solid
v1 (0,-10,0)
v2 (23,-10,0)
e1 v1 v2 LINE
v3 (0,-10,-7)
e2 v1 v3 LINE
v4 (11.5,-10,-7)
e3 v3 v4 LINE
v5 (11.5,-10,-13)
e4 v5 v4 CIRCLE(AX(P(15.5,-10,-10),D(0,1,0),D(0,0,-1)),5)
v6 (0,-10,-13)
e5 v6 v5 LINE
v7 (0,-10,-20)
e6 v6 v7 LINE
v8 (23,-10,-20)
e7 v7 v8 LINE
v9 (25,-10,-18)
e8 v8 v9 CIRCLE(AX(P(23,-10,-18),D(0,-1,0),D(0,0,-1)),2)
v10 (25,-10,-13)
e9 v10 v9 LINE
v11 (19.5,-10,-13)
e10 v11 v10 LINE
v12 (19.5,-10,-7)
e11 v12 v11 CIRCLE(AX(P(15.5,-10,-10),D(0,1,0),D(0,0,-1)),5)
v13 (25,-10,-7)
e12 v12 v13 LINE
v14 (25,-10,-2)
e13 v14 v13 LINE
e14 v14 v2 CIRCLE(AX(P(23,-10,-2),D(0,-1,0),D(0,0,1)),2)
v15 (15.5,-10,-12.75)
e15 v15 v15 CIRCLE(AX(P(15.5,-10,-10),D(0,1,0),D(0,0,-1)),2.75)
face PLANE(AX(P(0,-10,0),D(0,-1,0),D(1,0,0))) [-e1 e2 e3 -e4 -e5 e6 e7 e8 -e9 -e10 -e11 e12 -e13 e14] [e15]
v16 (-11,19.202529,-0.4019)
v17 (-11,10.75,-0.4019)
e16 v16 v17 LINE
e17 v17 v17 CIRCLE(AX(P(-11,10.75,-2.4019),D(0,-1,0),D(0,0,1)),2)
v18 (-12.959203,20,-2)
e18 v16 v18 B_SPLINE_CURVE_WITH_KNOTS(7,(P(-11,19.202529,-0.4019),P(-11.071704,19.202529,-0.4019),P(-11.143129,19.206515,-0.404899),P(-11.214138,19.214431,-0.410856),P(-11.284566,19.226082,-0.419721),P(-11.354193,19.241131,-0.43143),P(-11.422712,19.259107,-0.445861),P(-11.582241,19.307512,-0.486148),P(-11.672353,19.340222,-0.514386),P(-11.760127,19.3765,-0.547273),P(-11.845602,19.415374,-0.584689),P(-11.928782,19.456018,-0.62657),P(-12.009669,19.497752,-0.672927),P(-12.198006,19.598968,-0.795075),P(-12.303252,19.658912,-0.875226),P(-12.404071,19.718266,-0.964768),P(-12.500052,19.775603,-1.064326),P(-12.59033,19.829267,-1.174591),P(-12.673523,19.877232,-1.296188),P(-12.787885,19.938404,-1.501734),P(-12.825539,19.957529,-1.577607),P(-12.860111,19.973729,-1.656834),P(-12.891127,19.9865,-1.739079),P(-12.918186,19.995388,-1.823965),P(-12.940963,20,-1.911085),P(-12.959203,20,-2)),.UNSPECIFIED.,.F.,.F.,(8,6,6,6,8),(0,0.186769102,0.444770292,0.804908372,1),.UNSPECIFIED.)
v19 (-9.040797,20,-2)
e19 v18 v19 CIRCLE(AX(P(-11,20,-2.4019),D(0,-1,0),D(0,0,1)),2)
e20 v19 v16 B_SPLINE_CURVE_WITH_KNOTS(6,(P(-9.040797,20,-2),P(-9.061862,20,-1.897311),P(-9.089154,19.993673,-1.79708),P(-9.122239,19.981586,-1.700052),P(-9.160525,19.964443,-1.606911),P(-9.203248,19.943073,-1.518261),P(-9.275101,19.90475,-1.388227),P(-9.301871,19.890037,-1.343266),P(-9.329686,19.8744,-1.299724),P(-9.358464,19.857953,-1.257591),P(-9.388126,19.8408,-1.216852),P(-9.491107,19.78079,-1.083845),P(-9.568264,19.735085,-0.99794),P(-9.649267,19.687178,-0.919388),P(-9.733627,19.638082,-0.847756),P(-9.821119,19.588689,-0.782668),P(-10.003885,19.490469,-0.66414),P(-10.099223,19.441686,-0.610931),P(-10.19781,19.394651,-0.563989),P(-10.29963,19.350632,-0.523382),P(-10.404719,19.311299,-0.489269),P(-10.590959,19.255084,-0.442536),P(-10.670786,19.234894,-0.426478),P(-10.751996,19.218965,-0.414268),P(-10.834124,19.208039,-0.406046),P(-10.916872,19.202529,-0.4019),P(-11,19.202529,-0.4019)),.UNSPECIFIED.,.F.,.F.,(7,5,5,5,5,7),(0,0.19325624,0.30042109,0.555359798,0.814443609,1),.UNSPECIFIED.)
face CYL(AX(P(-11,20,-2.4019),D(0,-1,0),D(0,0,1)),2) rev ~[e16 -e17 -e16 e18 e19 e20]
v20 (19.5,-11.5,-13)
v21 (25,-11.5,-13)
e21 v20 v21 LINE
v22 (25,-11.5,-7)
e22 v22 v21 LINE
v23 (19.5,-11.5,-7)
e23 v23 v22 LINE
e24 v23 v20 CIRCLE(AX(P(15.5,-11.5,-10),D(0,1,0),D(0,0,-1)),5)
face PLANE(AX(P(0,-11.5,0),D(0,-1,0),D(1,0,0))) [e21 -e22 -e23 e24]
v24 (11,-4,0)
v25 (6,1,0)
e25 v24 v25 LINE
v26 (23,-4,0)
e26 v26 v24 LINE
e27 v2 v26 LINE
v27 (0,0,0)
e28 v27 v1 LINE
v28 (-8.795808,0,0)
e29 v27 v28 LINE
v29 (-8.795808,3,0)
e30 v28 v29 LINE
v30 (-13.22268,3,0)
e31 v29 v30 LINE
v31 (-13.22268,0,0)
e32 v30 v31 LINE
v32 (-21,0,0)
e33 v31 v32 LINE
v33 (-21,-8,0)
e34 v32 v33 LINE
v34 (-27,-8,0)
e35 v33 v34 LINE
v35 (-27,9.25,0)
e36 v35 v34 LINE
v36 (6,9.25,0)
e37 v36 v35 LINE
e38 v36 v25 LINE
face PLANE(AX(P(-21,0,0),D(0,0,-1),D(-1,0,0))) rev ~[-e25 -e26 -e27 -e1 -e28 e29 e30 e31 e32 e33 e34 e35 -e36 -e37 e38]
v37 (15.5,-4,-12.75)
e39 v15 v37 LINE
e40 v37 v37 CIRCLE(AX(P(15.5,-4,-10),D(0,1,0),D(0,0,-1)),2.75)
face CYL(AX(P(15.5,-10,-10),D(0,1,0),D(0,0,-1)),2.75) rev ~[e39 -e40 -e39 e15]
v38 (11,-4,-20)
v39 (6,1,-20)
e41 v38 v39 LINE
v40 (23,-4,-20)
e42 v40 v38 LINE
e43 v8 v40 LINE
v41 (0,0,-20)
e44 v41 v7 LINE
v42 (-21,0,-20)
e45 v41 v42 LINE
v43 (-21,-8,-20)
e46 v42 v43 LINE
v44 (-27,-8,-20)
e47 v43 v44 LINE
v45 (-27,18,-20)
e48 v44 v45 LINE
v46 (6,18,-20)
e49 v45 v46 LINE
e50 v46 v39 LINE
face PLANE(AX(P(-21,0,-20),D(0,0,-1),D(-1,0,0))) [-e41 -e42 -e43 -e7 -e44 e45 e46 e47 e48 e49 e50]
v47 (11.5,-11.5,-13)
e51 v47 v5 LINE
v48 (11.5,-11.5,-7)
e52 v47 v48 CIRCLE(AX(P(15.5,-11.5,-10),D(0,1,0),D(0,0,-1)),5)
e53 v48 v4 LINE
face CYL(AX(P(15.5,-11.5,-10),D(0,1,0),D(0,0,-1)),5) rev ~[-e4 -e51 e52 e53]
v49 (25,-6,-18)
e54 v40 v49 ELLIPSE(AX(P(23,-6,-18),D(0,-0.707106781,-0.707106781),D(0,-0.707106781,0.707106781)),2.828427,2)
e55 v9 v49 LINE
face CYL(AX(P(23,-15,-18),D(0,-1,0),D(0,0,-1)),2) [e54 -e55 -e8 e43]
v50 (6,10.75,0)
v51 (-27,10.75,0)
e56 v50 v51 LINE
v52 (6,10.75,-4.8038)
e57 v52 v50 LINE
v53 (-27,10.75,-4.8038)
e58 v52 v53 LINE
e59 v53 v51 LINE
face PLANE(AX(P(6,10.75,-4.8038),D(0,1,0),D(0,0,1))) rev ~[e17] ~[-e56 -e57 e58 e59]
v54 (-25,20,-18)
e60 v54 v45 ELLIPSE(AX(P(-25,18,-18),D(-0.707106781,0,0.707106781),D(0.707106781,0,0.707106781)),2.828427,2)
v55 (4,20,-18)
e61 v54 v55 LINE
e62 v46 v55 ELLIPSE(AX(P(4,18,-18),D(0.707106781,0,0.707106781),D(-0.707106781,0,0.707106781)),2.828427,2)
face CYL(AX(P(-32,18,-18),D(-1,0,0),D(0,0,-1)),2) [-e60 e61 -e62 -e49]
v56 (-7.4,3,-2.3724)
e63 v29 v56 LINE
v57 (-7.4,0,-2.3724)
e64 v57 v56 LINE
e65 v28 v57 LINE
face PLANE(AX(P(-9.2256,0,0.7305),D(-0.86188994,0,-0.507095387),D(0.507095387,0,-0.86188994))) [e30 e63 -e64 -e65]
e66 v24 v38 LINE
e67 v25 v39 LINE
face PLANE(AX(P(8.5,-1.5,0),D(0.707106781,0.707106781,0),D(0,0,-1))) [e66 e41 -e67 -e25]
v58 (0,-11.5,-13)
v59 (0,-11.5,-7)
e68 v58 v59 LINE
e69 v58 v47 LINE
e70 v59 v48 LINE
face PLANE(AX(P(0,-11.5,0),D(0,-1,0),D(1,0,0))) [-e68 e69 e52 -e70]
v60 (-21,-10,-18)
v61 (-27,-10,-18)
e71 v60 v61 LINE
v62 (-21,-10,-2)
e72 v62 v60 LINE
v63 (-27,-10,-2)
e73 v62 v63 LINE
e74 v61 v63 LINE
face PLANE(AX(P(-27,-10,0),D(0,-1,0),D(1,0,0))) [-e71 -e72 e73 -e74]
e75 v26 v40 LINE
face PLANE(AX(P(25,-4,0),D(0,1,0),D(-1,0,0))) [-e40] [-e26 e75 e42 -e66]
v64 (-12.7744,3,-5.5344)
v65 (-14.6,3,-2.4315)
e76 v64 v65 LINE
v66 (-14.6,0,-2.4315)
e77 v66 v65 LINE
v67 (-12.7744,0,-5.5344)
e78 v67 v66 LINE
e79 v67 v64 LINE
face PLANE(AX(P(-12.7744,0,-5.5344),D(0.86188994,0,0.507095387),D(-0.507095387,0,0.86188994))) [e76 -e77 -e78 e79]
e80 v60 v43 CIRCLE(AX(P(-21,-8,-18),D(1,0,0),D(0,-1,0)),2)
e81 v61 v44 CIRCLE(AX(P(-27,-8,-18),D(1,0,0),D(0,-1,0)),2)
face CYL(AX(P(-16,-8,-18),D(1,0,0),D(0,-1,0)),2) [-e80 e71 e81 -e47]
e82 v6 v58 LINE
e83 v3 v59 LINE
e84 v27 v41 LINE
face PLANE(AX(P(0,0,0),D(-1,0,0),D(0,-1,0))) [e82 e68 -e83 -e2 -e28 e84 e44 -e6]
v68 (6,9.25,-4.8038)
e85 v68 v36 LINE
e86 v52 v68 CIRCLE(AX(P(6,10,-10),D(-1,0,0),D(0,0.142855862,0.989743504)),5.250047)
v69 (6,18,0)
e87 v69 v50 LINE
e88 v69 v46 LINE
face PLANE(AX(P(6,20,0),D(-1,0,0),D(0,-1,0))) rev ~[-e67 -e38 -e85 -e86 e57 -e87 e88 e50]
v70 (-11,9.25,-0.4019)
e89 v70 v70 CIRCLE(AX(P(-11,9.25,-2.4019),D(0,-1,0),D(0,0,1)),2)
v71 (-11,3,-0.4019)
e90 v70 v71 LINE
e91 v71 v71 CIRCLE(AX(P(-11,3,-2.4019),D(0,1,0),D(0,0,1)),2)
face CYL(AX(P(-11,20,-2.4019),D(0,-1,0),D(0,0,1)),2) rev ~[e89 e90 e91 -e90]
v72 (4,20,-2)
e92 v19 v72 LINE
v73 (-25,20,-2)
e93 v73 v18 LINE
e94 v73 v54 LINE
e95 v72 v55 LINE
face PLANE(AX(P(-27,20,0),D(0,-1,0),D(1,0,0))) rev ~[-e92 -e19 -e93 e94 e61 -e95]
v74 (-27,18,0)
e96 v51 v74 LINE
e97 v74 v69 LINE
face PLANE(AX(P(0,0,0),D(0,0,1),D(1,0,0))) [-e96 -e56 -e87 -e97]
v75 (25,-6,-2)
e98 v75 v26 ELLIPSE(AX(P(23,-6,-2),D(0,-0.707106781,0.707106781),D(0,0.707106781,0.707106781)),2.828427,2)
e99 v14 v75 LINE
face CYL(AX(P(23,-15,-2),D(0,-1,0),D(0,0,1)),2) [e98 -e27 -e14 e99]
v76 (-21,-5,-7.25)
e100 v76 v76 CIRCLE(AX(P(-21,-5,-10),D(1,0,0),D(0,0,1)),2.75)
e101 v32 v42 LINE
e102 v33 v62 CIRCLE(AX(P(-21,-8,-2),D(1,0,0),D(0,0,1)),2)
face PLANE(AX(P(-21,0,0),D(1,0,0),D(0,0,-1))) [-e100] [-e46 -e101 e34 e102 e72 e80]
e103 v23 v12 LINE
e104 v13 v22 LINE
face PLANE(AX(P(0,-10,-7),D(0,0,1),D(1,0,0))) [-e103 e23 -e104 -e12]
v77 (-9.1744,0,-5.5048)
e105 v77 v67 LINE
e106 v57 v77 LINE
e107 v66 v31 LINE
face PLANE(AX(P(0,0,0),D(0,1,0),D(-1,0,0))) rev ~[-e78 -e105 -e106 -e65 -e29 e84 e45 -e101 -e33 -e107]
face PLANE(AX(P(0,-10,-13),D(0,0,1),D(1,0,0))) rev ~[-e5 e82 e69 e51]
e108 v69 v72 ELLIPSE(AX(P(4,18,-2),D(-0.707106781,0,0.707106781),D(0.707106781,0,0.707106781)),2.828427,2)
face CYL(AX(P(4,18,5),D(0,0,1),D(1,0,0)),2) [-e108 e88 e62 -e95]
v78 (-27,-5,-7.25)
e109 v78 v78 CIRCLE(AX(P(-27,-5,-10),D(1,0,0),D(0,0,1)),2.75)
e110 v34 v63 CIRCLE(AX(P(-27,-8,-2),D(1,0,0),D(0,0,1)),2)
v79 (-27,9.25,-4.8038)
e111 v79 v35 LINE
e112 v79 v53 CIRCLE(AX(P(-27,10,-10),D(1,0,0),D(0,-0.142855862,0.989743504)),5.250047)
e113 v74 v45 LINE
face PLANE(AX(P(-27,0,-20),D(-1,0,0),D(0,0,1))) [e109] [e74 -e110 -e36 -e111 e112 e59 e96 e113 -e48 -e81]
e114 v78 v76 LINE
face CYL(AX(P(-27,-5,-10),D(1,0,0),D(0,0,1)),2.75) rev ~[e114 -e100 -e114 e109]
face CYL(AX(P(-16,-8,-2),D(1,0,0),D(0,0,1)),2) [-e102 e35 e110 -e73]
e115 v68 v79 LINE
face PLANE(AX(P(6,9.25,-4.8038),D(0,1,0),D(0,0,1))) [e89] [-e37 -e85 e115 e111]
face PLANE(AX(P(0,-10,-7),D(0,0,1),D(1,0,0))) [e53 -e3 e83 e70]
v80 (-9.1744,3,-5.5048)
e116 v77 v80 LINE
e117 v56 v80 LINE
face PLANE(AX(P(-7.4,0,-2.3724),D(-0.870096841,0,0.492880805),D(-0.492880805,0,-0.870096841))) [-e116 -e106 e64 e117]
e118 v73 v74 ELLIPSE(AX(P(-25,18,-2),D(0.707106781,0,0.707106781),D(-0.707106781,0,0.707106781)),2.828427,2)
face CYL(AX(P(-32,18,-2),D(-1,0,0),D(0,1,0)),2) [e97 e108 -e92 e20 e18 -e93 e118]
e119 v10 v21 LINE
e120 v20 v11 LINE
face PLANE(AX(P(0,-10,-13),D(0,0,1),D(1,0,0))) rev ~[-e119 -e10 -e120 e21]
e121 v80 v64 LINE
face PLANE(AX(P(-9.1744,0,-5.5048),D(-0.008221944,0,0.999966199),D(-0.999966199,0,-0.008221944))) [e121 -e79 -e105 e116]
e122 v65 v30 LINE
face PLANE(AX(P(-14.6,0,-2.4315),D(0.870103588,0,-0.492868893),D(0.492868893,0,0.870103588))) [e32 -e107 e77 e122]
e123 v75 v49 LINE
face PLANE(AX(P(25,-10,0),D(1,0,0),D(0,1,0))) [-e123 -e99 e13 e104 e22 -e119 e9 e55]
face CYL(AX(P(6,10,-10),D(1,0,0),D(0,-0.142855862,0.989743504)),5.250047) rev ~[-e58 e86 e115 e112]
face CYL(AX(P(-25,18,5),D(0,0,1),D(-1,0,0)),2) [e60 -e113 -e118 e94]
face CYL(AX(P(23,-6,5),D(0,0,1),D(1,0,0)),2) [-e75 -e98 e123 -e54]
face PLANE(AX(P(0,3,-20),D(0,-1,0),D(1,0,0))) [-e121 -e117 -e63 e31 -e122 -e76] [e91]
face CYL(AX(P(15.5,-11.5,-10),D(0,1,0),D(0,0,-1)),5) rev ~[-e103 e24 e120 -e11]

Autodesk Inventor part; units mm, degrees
ref_plane "YZ Plane" through (0, 0, 0) normal (1, 0, 0) x (0, 1, 0)
ref_plane "XZ Plane" through (0, 0, 0) normal (0, 1, 0) x (-1, 0, 0)
ref_plane "XY Plane" through (0, 0, 0) normal (0, 0, 1) x (1, 0, 0)
sketch "Sketch2" plane through (0, 0, 0) normal (0, 0, 1) x (1, 0, 0)
  line L0 (0, 0) -> (0, -10)
  line L1 (0, 0) -> (-27, 0)
  line L2 (-27, 0) -> (-27, 20)
  line L3 (-27, 20) -> (6, 20)
  line L4 (0, -10) -> (25, -10)
  line L5 (25, -10) -> (25, -4)
  line L6 (25, -4) -> (6, -4)
  line L7 (6, 20) -> (6, -4)
  dimension "d4" = 10
  dimension "d5" = 27
  dimension "d6" = 20
  dimension "d7" = 33
  dimension "d9" = 25
  dimension "d10" = 6
extrude "Extrusion6" add sketch "Sketch2" against normal blind 20
sketch "Sketch9" plane through (6, -4, 0) normal (1, 0, 0) x (0, 0, -1)
  line L0 (0, 4) -> (20, 4) projected
  line L1 (20, 24) -> (20, 0) projected
  line L2 (0, 4) -> (20, 24)
  arc A0 (4.8038, 13.25) -> (4.8038, 14.75) centre (10, 14) ccw
  line L3 (4.8038, 14.75) -> (0, 14.75)
  line L4 (4.8038, 13.25) -> (0, 13.25)
  line L5 (0, 13.25) -> (0, 14.75)
  line L6 (0, 0) -> (0, 24) projected
  dimension "d28" = 10.5
extrude "Extrusion7" cut sketch "Sketch9" against normal through all contours A0 L4 L5 L3 L2 | L2 A0
sketch "Sketch10" plane through (-27, 0, 0) normal (0, -1, 0) x (1, 0, 0)
  line L0 (33, 0) -> (0, 0) projected
  line L1 (0, 0) -> (6, 0)
  line L2 (6, 0) -> (6, -20)
  line L3 (6, -20) -> (0, -20)
  line L4 (0, -20) -> (0, 0)
  point P0 (27, 0)
  dimension "d33" = 6
  dimension "d34" = 20
extrude "Extrusion8" add sketch "Sketch10" along normal blind 10
sketch "Sketch11" plane through (-27, 20, -20) normal (-1, 0, 0) x (0, 0, 1)
  line L0 (20, -30) -> (0, -30) projected
  line L1 (20, -20) -> (20, -30) projected
  line L2 (0, -30) -> (20, -20)
  point P0 (10, -25)
hole "Hole1" at (-27, -5, -10) direction (1, 0, 0) diameter 5.5 end up to surface
sketch "Sketch13" plane through (0, -10, 0) normal (0, -1, 0) x (1, 0, 0)
  line L0 (0, -13) -> (25, -13)
  line L1 (0, -7) -> (25, -7)
  line L2 (0, -13) -> (0, -7)
  line L3 (0, 0) -> (0, -20) projected
  line L4 (25, -7) -> (25, -13)
  line L5 (0, 0) -> (25, 0) projected
  dimension "d69" = 25
extrude "Extrusion9" add sketch "Sketch13" along normal blind 1.5
sketch "Sketch14" plane through (0, -11.5, 0) normal (0, -1, 0) x (1, 0, 0)
  line L0 (0, -7) -> (25, -7) projected
  line L1 (25, -13) -> (0, -13) projected
  line L2 (0, -13) -> (25, -13) projected
  line L3 (25, 0) -> (25, -7) projected
  point P0 (0, 0)
  point P1 (15.5, -10)
  dimension "d70" = 9.5
hole "Hole2" at (15.5, -11.5, -10) direction (0, 1, 0) diameter 5.5 end through all counterbore diameter 10 counterbore depth 1.5
sketch "Sketch15" plane through (-27, 20, 0) normal (0, 1, 0) x (1, 0, 0)
  line L0 (33, 4.8038) -> (0, 4.8038) projected
  point P0 (27, 0)
  point P1 (16, 2.4019)
hole "Hole3" at (-11, 20, -2.4019) direction (0, -1, 0) diameter 4 end through all
sketch "Sketch16" plane through (0, 0, -20) normal (0, -1, 0) x (1, 0, 0)
  circle A0 centre (-11, 17.5981) radius 2 projected
  line L0 (-7.4, 17.6276) -> (-9.1744, 14.4952)
  line L1 (-9.1744, 14.4952) -> (-12.7744, 14.4656)
  line L2 (-12.7744, 14.4656) -> (-14.6, 17.5685)
  line L3 (-14.6, 17.5685) -> (-12.8256, 20.701)
  line L4 (-12.8256, 20.701) -> (-9.2256, 20.7305)
  line L5 (-9.2256, 20.7305) -> (-7.4, 17.6276)
  point P0 (0, 20)
  point P1 (-11, 17.5981)
  dimension "d65" = 7.2
extrude "Extrusion10" cut sketch "Sketch16" against normal blind 3
fillet "Fillet2" radius 2 9 edges at (-24, -10, 0) (-24, -10, -20) (-27, 20, -10) (6, 20, -10) (-10.5, 20, -20) (-10.5, 20, 0) (25, -7, -20) (25, -4, -10) (25, -7, 0)
chamfer "Chamfer3" distance 5 angle 45 1 edges at (6, -4, -10)
properties part number "EixoXY - Canto"
